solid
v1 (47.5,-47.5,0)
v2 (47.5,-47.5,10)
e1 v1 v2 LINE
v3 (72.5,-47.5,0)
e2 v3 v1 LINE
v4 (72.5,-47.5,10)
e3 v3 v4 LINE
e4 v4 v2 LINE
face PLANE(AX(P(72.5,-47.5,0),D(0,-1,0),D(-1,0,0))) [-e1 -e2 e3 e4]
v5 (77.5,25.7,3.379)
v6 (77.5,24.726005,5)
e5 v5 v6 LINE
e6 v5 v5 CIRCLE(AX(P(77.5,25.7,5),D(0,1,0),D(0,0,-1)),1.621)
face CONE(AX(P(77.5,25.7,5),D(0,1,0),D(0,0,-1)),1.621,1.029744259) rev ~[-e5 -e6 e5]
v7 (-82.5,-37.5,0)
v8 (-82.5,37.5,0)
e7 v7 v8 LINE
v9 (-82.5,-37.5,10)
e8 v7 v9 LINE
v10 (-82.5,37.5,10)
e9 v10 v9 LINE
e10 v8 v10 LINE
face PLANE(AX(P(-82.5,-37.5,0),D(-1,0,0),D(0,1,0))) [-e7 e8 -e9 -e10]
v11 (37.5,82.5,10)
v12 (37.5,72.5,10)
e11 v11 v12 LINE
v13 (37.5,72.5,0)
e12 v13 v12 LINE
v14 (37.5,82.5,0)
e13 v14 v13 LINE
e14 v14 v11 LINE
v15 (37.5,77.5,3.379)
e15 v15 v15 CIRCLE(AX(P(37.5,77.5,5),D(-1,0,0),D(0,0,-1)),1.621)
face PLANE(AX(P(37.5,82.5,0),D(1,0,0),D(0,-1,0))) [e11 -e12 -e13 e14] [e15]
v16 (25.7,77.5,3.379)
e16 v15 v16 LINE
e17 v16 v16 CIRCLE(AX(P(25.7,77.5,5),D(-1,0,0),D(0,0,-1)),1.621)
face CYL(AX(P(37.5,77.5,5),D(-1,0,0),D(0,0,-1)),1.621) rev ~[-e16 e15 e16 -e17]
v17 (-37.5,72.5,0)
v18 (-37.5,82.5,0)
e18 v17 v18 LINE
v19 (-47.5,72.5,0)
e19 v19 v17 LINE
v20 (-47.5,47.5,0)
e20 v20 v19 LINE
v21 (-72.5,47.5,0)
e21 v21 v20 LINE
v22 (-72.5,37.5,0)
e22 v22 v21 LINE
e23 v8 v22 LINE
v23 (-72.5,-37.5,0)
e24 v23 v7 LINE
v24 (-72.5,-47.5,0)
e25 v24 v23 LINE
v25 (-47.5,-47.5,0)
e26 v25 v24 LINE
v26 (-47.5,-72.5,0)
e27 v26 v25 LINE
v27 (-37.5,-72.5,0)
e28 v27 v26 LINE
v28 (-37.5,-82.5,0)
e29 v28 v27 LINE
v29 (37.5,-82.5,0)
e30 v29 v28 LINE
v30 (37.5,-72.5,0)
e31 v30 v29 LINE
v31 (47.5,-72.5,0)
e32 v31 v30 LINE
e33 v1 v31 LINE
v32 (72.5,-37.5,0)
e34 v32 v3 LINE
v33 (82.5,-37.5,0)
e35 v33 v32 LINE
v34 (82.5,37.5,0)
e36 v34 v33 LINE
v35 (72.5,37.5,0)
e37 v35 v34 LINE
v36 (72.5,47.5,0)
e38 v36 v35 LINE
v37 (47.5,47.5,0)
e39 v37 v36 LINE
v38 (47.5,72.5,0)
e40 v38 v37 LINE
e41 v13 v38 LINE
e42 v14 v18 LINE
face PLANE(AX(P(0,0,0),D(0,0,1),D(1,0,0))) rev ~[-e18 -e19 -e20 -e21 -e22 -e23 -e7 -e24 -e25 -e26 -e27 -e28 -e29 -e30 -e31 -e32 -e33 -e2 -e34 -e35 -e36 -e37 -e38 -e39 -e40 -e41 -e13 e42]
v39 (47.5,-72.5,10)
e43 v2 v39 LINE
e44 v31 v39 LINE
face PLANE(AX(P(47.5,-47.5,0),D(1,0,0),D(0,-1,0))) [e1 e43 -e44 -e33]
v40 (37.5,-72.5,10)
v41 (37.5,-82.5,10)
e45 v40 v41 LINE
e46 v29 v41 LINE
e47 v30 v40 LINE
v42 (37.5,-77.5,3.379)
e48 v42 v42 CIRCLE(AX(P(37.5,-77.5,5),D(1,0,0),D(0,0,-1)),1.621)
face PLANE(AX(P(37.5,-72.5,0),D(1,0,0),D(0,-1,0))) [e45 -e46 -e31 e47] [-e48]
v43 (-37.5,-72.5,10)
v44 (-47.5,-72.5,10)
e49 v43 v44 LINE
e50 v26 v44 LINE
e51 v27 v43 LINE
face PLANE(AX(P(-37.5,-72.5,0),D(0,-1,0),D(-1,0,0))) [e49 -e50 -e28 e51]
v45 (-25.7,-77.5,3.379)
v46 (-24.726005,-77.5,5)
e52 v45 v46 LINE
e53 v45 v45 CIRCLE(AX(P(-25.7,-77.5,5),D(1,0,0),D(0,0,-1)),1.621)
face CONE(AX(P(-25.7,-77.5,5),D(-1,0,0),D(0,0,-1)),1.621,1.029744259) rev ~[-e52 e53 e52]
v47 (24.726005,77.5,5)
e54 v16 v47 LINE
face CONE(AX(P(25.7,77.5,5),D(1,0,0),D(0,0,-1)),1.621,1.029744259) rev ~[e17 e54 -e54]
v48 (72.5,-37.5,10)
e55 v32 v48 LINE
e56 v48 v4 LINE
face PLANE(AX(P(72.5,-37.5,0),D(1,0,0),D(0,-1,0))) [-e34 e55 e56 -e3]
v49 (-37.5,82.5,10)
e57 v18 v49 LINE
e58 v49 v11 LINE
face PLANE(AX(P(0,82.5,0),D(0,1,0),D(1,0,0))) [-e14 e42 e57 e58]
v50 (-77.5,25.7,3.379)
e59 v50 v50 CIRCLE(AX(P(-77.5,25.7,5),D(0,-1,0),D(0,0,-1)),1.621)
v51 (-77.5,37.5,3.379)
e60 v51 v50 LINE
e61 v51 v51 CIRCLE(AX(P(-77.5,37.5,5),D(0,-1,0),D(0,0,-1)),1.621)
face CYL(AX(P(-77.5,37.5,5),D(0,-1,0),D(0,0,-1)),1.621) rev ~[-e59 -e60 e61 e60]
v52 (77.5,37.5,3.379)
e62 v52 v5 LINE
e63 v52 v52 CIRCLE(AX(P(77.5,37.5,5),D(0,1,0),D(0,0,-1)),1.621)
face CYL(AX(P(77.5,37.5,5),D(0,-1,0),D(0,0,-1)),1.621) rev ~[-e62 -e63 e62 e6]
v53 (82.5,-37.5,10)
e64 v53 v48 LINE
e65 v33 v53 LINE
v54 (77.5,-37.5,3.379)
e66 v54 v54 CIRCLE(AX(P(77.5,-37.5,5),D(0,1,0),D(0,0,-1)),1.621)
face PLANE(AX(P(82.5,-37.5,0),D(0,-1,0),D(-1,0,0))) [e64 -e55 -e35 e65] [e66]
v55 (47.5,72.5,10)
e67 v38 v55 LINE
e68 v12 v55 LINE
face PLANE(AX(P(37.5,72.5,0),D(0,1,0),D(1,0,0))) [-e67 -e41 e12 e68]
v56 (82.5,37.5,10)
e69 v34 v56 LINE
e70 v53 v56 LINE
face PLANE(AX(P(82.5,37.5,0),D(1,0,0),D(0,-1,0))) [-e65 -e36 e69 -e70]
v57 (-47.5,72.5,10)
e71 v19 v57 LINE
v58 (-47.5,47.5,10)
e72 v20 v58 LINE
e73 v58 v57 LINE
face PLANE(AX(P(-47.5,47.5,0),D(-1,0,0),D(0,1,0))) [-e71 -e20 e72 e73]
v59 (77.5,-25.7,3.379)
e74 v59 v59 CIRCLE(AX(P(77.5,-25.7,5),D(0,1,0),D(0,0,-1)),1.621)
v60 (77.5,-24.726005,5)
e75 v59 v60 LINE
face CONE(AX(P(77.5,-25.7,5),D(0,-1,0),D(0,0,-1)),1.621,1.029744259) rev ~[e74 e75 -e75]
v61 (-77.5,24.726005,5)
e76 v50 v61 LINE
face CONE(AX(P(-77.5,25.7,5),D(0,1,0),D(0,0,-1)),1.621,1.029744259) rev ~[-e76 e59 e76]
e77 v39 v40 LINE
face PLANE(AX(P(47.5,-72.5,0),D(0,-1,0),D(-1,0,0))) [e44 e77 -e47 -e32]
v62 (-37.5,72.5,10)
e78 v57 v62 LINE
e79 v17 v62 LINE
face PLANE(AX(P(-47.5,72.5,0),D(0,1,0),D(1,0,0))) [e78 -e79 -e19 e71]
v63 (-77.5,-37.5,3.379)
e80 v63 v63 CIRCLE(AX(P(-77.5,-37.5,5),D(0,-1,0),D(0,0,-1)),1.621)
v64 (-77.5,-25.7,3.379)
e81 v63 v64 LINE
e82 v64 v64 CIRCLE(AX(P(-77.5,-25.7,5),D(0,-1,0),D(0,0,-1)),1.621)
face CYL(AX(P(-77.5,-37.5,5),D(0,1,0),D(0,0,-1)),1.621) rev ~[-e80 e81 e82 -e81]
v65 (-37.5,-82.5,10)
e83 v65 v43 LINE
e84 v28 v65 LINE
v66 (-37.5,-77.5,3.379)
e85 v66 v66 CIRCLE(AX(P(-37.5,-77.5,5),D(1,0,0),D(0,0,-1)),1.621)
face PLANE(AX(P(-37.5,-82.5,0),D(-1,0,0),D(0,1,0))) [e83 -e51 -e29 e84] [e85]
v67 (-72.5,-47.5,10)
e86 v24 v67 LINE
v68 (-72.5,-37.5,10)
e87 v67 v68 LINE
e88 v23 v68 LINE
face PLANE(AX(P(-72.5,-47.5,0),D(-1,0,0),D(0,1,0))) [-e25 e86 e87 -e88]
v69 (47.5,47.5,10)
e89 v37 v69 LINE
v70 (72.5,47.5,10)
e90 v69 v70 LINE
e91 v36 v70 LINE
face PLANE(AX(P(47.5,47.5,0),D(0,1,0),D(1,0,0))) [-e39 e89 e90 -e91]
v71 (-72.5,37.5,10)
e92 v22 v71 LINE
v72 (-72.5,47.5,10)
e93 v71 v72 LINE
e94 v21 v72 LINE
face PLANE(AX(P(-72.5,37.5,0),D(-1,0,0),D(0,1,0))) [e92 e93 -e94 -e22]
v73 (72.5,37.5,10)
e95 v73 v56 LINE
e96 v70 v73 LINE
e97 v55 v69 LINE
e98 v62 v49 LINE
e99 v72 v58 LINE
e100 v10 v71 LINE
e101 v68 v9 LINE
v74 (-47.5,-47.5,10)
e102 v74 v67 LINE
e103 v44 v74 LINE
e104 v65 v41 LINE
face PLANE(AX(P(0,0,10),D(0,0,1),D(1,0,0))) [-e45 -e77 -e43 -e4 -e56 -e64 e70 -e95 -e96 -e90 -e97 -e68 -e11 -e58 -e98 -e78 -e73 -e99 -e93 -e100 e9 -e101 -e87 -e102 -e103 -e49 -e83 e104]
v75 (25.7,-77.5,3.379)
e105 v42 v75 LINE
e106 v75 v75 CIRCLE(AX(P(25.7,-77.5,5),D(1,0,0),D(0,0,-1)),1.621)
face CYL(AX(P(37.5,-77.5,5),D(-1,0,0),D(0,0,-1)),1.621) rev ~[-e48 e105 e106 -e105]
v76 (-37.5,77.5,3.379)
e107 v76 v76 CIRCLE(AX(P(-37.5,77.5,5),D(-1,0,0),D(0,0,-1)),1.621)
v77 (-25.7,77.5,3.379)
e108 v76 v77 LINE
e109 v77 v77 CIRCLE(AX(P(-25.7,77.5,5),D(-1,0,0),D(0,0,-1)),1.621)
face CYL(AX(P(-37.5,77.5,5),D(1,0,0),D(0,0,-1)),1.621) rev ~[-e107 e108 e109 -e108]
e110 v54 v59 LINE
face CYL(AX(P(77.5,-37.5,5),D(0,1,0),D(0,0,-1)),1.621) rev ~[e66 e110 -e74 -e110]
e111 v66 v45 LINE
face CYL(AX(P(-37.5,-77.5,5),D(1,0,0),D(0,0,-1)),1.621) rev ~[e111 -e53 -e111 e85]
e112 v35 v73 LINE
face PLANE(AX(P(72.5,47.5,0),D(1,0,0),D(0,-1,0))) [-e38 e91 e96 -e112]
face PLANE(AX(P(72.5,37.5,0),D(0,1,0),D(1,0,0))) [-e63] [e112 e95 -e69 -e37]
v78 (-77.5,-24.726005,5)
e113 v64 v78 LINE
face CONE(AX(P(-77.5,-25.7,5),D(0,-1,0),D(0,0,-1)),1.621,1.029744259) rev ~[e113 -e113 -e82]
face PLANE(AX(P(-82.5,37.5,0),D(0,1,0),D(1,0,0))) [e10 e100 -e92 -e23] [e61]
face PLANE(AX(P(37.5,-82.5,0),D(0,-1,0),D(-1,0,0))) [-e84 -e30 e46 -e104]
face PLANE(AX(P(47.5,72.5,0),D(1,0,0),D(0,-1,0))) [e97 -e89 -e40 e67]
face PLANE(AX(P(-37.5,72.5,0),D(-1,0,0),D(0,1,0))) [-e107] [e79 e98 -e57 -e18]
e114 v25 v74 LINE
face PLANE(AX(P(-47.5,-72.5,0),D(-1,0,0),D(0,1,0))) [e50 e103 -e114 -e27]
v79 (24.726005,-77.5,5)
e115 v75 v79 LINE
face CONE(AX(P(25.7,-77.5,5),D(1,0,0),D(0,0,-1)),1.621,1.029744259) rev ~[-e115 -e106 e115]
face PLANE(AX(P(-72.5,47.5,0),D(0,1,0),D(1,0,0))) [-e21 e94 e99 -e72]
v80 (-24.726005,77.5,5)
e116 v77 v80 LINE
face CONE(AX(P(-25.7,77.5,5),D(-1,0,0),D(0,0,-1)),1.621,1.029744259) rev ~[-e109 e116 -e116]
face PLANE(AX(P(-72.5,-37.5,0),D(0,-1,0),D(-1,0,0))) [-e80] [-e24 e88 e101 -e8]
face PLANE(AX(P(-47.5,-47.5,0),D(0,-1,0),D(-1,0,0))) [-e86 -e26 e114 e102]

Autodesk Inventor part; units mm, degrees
ref_plane "YZ Plane" through (0, 0, 0) normal (1, 0, 0) x (0, 1, 0)
ref_plane "XZ Plane" through (0, 0, 0) normal (0, 1, 0) x (-1, 0, 0)
ref_plane "XY Plane" through (0, 0, 0) normal (0, 0, 1) x (1, 0, 0)
sketch "Sketch1" plane through (0, 0, 0) normal (0, 0, 1) x (1, 0, 0)
  line L0 (0, 82.5) -> (37.5, 82.5)
  line L1 (37.5, 82.5) -> (37.5, 72.5)
  line L2 (37.5, 72.5) -> (47.5, 72.5)
  line L3 (0, 101.1294) -> (0, 0)
  line L4 (0, 0) -> (69.4378, 0)
  line L5 (72.5, 47.5) -> (72.5, 37.5)
  line L6 (72.5, 37.5) -> (82.5, 37.5)
  line L7 (82.5, 37.5) -> (82.5, 0)
  line L8 (47.5, 72.5) -> (47.5, 47.5)
  line L9 (47.5, 47.5) -> (72.5, 47.5)
  line L10 (-82.5, 0) -> (-82.5, 37.5)
  line L11 (-82.5, 37.5) -> (-72.5, 37.5)
  line L12 (-72.5, 37.5) -> (-72.5, 47.5)
  line L13 (0, 0) -> (0, 69.4378)
  line L14 (-47.5, 72.5) -> (-37.5, 72.5)
  line L15 (-37.5, 72.5) -> (-37.5, 82.5)
  line L16 (-37.5, 82.5) -> (0, 82.5)
  line L17 (-72.5, 47.5) -> (-47.5, 47.5)
  line L18 (-47.5, 47.5) -> (-47.5, 72.5)
  line L19 (0, -82.5) -> (-37.5, -82.5)
  line L20 (-37.5, -82.5) -> (-37.5, -72.5)
  line L21 (-37.5, -72.5) -> (-47.5, -72.5)
  line L22 (0, 0) -> (-69.4378, 0)
  line L23 (-72.5, -47.5) -> (-72.5, -37.5)
  line L24 (-72.5, -37.5) -> (-82.5, -37.5)
  line L25 (-82.5, -37.5) -> (-82.5, 0)
  line L26 (-47.5, -72.5) -> (-47.5, -47.5)
  line L27 (-47.5, -47.5) -> (-72.5, -47.5)
  line L28 (82.5, 0) -> (82.5, -37.5)
  line L29 (82.5, -37.5) -> (72.5, -37.5)
  line L30 (72.5, -37.5) -> (72.5, -47.5)
  line L31 (0, 0) -> (0, -69.4378)
  line L32 (47.5, -72.5) -> (37.5, -72.5)
  line L33 (37.5, -72.5) -> (37.5, -82.5)
  line L34 (37.5, -82.5) -> (0, -82.5)
  line L35 (72.5, -47.5) -> (47.5, -47.5)
  line L36 (47.5, -47.5) -> (47.5, -72.5)
  point P0 (0, 50.5647)
  point P1 (-50.5647, 0)
  point P2 (0, -50.5647)
  point P3 (50.5647, 0)
  point P4 (82.5, 0)
  dimension "d0" = 75
  dimension "d1" = 165
  dimension "d2" = 10
  dimension "d3" = 10
  dimension "d4" = 165
  dimension "d5" = 75
  dimension "d25" = 10
  dimension "d26" = 10
  dimension "d29" = 360
extrude "Extrusion1" add sketch "Sketch1" along normal blind 10
sketch "Sketch2" plane through (37.5, 72.5, 0) normal (1, 0, 0) x (0, 0, -1)
  circle A0 centre (-5, 5) radius 2
  line L0 (0, 0) -> (0, 10) projected
  line L1 (0, 10) -> (-10, 10) projected
  point P0 (0, -72.5)
  dimension "d12" = 4
  dimension "d13" = 5
  dimension "d14" = 5
hole "Hole1" at (37.5, 77.5, 5) direction (-1, 0, 0) diameter 3.242 depth 11.8 tip angle 118 thread size "M4x0.7" class "6H" standard "ISO Metric profile"
mirror "Mirror1" about plane through (0, 0, 0) normal (1, 0, 0) of "Hole1"
pattern_circular "Circular Pattern1" count 4 over 360 about axis through (0, 0, -10) along (0, 0, 1) of "Hole1", "Mirror1"
properties part number "gearbox_cap" material "PMMA Plastic"
